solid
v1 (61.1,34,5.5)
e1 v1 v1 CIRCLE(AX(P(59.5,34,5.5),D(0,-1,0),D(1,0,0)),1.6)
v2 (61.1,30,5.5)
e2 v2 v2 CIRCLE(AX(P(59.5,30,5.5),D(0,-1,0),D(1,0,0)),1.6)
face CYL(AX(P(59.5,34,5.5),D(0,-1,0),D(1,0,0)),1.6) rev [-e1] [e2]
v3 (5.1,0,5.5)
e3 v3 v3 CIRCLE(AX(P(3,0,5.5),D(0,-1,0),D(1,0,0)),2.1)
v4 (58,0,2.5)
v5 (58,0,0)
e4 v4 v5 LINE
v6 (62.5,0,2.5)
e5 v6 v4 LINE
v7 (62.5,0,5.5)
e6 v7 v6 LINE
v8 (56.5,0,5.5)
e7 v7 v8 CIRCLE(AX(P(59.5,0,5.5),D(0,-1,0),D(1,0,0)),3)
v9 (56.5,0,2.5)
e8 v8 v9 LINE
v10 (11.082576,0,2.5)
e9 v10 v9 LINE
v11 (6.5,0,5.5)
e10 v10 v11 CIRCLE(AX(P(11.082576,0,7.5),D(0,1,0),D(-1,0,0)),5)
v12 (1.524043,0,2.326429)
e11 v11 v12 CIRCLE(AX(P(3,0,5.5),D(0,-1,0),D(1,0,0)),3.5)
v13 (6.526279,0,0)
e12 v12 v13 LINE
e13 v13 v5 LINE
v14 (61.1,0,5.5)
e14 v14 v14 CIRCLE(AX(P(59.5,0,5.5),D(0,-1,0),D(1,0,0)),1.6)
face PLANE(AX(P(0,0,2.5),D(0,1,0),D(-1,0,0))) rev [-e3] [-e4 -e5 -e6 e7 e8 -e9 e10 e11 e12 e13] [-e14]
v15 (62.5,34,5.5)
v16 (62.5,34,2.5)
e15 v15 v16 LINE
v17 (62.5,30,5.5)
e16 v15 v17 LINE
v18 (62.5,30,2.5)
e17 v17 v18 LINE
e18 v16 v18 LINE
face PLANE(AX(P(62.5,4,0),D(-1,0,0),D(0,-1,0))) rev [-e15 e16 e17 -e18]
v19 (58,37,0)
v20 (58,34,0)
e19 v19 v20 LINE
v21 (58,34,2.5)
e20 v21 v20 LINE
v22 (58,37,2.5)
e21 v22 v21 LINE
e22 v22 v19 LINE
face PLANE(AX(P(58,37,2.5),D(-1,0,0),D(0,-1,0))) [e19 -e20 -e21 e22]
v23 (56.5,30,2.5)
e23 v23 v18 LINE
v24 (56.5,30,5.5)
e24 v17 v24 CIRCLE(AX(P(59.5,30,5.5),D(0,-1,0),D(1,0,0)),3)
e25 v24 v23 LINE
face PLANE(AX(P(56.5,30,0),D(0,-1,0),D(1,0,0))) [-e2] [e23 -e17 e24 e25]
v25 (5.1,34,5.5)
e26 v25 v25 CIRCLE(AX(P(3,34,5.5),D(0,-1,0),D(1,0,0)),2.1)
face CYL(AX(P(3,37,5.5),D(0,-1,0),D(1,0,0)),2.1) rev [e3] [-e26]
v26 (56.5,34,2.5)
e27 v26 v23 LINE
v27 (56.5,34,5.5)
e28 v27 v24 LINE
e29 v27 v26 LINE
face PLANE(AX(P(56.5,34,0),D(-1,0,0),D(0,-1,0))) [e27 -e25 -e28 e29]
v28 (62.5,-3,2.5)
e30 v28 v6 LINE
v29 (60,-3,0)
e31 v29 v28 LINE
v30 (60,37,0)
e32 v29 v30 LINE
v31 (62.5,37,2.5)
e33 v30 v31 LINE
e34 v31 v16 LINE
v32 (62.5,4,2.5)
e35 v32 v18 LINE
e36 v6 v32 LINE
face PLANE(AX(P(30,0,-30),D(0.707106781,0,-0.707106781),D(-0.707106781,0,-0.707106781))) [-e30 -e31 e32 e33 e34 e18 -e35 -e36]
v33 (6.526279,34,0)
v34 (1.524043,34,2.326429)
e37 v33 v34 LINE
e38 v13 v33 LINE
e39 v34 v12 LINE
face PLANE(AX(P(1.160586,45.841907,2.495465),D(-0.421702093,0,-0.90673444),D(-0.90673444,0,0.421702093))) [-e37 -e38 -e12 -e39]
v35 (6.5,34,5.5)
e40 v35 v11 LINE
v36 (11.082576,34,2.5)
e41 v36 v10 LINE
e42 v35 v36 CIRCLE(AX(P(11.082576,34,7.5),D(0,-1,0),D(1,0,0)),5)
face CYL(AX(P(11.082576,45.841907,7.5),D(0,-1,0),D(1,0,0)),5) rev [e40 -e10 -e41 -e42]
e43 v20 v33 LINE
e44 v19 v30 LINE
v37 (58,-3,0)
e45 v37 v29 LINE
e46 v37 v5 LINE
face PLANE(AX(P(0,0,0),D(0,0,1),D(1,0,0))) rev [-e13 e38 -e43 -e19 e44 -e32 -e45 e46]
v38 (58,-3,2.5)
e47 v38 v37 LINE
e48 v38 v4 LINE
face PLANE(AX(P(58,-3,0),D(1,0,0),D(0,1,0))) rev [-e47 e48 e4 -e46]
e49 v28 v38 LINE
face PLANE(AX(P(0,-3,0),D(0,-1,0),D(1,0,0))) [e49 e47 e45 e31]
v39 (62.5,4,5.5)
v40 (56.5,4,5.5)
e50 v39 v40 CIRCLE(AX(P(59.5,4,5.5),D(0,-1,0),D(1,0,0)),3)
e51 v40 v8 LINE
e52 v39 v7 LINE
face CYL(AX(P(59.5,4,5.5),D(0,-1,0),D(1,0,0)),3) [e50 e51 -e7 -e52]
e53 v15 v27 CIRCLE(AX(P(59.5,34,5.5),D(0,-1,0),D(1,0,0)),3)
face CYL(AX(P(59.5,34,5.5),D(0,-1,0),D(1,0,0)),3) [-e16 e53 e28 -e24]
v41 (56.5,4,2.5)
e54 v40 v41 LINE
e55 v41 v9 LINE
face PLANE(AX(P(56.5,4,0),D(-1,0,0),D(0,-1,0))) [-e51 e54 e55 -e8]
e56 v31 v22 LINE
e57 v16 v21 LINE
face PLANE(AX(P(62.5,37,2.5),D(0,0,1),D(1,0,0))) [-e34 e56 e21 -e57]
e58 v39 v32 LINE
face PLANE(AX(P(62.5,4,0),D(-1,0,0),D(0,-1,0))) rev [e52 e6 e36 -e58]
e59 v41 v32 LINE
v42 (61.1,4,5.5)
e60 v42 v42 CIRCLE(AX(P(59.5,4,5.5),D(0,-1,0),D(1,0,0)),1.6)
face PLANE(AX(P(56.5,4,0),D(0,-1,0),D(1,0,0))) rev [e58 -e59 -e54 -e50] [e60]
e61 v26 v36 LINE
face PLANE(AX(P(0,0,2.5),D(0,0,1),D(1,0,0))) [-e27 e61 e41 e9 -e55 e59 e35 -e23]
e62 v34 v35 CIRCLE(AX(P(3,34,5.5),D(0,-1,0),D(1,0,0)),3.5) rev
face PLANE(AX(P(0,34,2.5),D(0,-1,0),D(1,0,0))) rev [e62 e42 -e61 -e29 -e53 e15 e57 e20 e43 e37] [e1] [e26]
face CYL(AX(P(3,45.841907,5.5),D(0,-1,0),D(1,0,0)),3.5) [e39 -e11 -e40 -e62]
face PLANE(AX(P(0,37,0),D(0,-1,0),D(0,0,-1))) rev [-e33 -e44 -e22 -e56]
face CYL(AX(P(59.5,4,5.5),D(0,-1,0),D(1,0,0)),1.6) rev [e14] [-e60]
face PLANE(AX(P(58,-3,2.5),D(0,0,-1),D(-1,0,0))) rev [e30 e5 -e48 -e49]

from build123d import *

# Parameters (mm, degrees)
SKETCH_1_W                  = 60
SKETCH_1_H                  = 34
EXTRUDE_1_DEPTH             = 2.5
SKETCH_3_R                  = 3
SKETCH_3_R_2                = 1.6
EXTRUDE_2_DEPTH             = 4
PATTERN_LINEAR_1_COUNT      = 2
PATTERN_LINEAR_1_PITCH      = 56.5
PATTERN_LINEAR_1_COUNT_DIR2 = 2
PATTERN_LINEAR_1_PITCH_DIR2 = 30
SKETCH_5_W                  = 2.5
SKETCH_5_H                  = 34
EXTRUDE_3_DEPTH             = 4
SKETCH_6_W                  = 2.5
SKETCH_6_H                  = 34
EXTRUDE_4_DEPTH             = 4
CUT_EXTRUDE_1_DEPTH         = 73.9674585
EXTRUDE_13_REACH            = 73.192
SKETCH_8_R                  = 1.6
CUT_EXTRUDE_2_DEPTH         = 73.9674585
EXTRUDE_START               = -34
EXTRUDE_14_DEPTH            = 34
SKETCH_10_W                 = 1.5
SKETCH_10_H                 = 2.5
CUT_EXTRUDE_3_DEPTH         = 34
CUT_EXTRUDE_4_DEPTH         = 72.655425475
CUT_EXTRUDE_4_DEPTH_BACK    = 72.655425475
EXTRUDE_16_DEPTH            = 3
EXTRUDE_17_DEPTH            = 3
SKETCH_15_R                 = 2.1
CUT_EXTRUDE_6_DEPTH         = 74.126602547
EXTRUDE_18_DEPTH            = 34
FILLET_1_R                  = 5


# Read off the part's stored shape, not the designer's step: 凸台-拉伸18
with BuildPart() as part:
    # 草图1 → 凸台-拉伸1 (new body)
    with BuildSketch(Plane.XY):
        with Locations((30, 17)):
            Rectangle(SKETCH_1_W, SKETCH_1_H)
    extrude(amount=EXTRUDE_1_DEPTH)

    # 草图3 → 凸台-拉伸2 (add)
    # profile 1 of 3: a face of its own
    with BuildSketch(Plane.XZ):
        with BuildLine():
            Line((6, 2.5), (6, 5.5))
            ThreePointArc((6, 5.5), (5.121320344, 3.378679656), (3, 2.5))
            Line((3, 2.5), (6, 2.5))
        make_face()
    # profile 2 of 3: a face of its own
    with BuildSketch(Plane.XZ):
        with BuildLine():
            ThreePointArc((3, 2.5), (0.878679656, 3.378679656), (0, 5.5))
            Line((0, 5.5), (0, 2.5))
            Line((0, 2.5), (3, 2.5))
        make_face()
    # profile 3 of 3: a face of its own
    with BuildSketch(Plane.XZ):
        with Locations((3, 5.5)):
            Circle(SKETCH_3_R)
        with Locations((3, 5.5)):
            Circle(SKETCH_3_R_2, mode=Mode.SUBTRACT)
    extrude_2 = extrude(amount=-EXTRUDE_2_DEPTH)

    # 阵列(线性)1: Extrude 2 2 × 2
    with Locations(*[(i * PATTERN_LINEAR_1_PITCH, j * PATTERN_LINEAR_1_PITCH_DIR2, 0) for i in range(PATTERN_LINEAR_1_COUNT) for j in range(PATTERN_LINEAR_1_COUNT_DIR2) if (i, j) != (0, 0)]):
        add(extrude_2)

    # 草图5 → 凸台-拉伸3 (add)
    with BuildSketch(Plane.ZY):
        with Locations((1.25, 17)):
            Rectangle(SKETCH_5_W, SKETCH_5_H)
    extrude(amount=EXTRUDE_3_DEPTH)

    # 草图6 → 凸台-拉伸4 (add)
    with BuildSketch(Plane(origin=(60, 0, 0), x_dir=(0, 0, -1), z_dir=(1, 0, 0))):
        with Locations((-1.25, 17)):
            Rectangle(SKETCH_6_W, SKETCH_6_H)
    extrude(amount=EXTRUDE_4_DEPTH)

    # 草图7 → 切除-拉伸1 (cut, through all)
    with BuildSketch(Plane(origin=(0, 34, 0), x_dir=(1, 0, 0), z_dir=(0, 1, 0))):
        with BuildLine():
            ThreePointArc((0, -5.5), (0.878679656, -3.378679656), (3, -2.5))
            Line((3, -2.5), (3, 0))
            Line((3, 0), (-4, 0))
            Line((-4, 0), (-4, -2.5))
            Line((-4, -2.5), (0, -2.5))
            Line((0, -2.5), (0, -5.5))
        make_face()
    extrude(amount=-CUT_EXTRUDE_1_DEPTH, mode=Mode.SUBTRACT)

    # 草图8 → 凸台-拉伸13 (add, up to next)
    with BuildSketch(Plane(origin=(0, 4, 0), x_dir=(1, 0, 0), z_dir=(0, 1, 0)), mode=Mode.PRIVATE) as extrude_13_sk1:
        with BuildLine():
            ThreePointArc((3, -2.5), (0.878679656, -7.621320344), (6, -5.5))
            ThreePointArc((6, -5.5), (5.121320344, -3.378679656), (3, -2.5))
        make_face()
        with Locations((3, -5.5)):
            Circle(SKETCH_8_R, mode=Mode.SUBTRACT)
    extrude_13_tool1 = extrude(extrude_13_sk1.sketch, amount=EXTRUDE_13_REACH, mode=Mode.PRIVATE) - part.part
    # 草图8 → 凸台-拉伸13 (add, up to next)
    with BuildSketch(Plane(origin=(0, 4, 0), x_dir=(1, 0, 0), z_dir=(0, 1, 0)), mode=Mode.PRIVATE) as extrude_13_sk2:
        with BuildLine():
            ThreePointArc((3, -2.5), (5.121320344, -3.378679656), (6, -5.5))
            Line((6, -5.5), (6, -2.5))
            Line((6, -2.5), (3, -2.5))
        make_face()
    extrude_13_tool2 = extrude(extrude_13_sk2.sketch, amount=EXTRUDE_13_REACH, mode=Mode.PRIVATE) - part.part
    add(extrude_13_tool1.solids().sort_by_distance((5.06132, 4, 3.43868))[0])
    add(extrude_13_tool2.solids().sort_by_distance((5.329896, 4, 3.170104))[0])

    # 草图9 → 切除-拉伸2 (cut, through all)
    with BuildSketch(Plane(origin=(0, 34, 0), x_dir=(1, 0, 0), z_dir=(0, 1, 0))):
        Polygon((3, 0), (3, -2.035898385), (6.526279442, 0), align=None)
    extrude(amount=-CUT_EXTRUDE_2_DEPTH, mode=Mode.SUBTRACT)

    # 草图9<3> → 凸台-拉伸14 (add)
    with BuildSketch(Plane(origin=(0, 34, 0), x_dir=(1, 0, 0), z_dir=(0, 1, 0)).offset(EXTRUDE_START)):
        Polygon((6, -2.5), (6, -3.190598923), (7.196152423, -2.5), align=None)
        with BuildLine():
            Line((3, -2.035898385), (1.5, -2.901923789))
            ThreePointArc((1.5, -2.901923789), (2.223542865, -2.602222521), (3, -2.5))
            Line((3, -2.5), (3, -2.035898385))
        make_face()
    extrude(amount=EXTRUDE_14_DEPTH)

    # 草图10 → 切除-拉伸3 (cut)
    with BuildSketch(Plane(origin=(0, 34, 0), x_dir=(1, 0, 0), z_dir=(0, 1, 0))):
        with Locations((63.25, -1.25)):
            Rectangle(SKETCH_10_W, SKETCH_10_H)
    extrude(amount=-CUT_EXTRUDE_3_DEPTH, mode=Mode.SUBTRACT)

    # 草图11 → 切除-拉伸4 (cut, two sides: drawn at the far end of the back side and taken through both)
    with BuildSketch(Plane(origin=(0, 34, 0), x_dir=(1, 0, 0), z_dir=(0, 1, 0)).offset(-CUT_EXTRUDE_4_DEPTH_BACK)):
        Polygon((60, 0), (62.5, -2.5), (62.5, 0), align=None)
    extrude(amount=CUT_EXTRUDE_4_DEPTH + CUT_EXTRUDE_4_DEPTH_BACK, mode=Mode.SUBTRACT)

    # 草图13 → 凸台-拉伸16 (add)
    with BuildSketch(Plane(origin=(0, 34, 0), x_dir=(1, 0, 0), z_dir=(0, 1, 0))):
        Polygon((62.5, -2.5), (58, -2.5), (58, 0), (60, 0), align=None)
    extrude(amount=EXTRUDE_16_DEPTH)

    # 草图14 → 凸台-拉伸17 (add)
    with BuildSketch(Plane.XZ):
        Polygon((62.5, 2.5), (60, 0), (58, 0), (58, 2.5), align=None)
    extrude(amount=EXTRUDE_17_DEPTH)

    # 草图15 → 切除-拉伸6 (cut, through all)
    with BuildSketch(Plane.XZ):
        with Locations((3, 5.5)):
            Circle(SKETCH_15_R)
    extrude(amount=-CUT_EXTRUDE_6_DEPTH, mode=Mode.SUBTRACT)

    # 凸台-拉伸18 outline → 凸台-拉伸18 (add)
    with BuildSketch(Plane(origin=(0, 0, 0), x_dir=(-1, 0, 0), z_dir=(0, -1, 0)).offset(EXTRUDE_START)):
        with BuildLine():
            Line((-7.196152423, -2.5), (-6.5, -5.5))
            ThreePointArc((-6.5, -5.5), (-1.117959969, -8.450919402), (-1.524042675, -2.32642946))
            Line((-1.524042675, -2.32642946), (-6.526279442, 0))
            Line((-6.526279442, 0), (-1.5, -2.901923789))
            ThreePointArc((-1.5, -2.901923789), (-1.5, -8.098076211), (-6, -5.5))
            Line((-6, -5.5), (-6, -3.190598923))
            Line((-6, -3.190598923), (-7.196152423, -2.5))
        make_face()
    extrude(amount=EXTRUDE_18_DEPTH)

    # 圆角1
    # the kernel refuses this fillet: 5 mm, written as the material it adds along each edge
    with BuildSketch(Plane(origin=(7.196152423, 0, 2.5), x_dir=(1, 0, 0), z_dir=(0, 1, 0))) as fillet_1_piece_1:
        with BuildLine():
            CenterArc((3.886423272, -5), FILLET_1_R, 90, 66.421821522)
            Line((-0.696152423, -3), (-0.787803937, -2.96))
            ThreePointArc((-0.787803937, -2.96), (-0.445487906, -1.477395538), (-0.097411695, 0.022604462))
            Line((-0.097411695, 0.022604462), (0, 0.1))
            Line((0, 0.1), (3.886423272, 0.1))
            Line((3.886423272, 0.1), (3.886423272, 0))
        make_face()
    extrude(amount=34)


solid = part.part
